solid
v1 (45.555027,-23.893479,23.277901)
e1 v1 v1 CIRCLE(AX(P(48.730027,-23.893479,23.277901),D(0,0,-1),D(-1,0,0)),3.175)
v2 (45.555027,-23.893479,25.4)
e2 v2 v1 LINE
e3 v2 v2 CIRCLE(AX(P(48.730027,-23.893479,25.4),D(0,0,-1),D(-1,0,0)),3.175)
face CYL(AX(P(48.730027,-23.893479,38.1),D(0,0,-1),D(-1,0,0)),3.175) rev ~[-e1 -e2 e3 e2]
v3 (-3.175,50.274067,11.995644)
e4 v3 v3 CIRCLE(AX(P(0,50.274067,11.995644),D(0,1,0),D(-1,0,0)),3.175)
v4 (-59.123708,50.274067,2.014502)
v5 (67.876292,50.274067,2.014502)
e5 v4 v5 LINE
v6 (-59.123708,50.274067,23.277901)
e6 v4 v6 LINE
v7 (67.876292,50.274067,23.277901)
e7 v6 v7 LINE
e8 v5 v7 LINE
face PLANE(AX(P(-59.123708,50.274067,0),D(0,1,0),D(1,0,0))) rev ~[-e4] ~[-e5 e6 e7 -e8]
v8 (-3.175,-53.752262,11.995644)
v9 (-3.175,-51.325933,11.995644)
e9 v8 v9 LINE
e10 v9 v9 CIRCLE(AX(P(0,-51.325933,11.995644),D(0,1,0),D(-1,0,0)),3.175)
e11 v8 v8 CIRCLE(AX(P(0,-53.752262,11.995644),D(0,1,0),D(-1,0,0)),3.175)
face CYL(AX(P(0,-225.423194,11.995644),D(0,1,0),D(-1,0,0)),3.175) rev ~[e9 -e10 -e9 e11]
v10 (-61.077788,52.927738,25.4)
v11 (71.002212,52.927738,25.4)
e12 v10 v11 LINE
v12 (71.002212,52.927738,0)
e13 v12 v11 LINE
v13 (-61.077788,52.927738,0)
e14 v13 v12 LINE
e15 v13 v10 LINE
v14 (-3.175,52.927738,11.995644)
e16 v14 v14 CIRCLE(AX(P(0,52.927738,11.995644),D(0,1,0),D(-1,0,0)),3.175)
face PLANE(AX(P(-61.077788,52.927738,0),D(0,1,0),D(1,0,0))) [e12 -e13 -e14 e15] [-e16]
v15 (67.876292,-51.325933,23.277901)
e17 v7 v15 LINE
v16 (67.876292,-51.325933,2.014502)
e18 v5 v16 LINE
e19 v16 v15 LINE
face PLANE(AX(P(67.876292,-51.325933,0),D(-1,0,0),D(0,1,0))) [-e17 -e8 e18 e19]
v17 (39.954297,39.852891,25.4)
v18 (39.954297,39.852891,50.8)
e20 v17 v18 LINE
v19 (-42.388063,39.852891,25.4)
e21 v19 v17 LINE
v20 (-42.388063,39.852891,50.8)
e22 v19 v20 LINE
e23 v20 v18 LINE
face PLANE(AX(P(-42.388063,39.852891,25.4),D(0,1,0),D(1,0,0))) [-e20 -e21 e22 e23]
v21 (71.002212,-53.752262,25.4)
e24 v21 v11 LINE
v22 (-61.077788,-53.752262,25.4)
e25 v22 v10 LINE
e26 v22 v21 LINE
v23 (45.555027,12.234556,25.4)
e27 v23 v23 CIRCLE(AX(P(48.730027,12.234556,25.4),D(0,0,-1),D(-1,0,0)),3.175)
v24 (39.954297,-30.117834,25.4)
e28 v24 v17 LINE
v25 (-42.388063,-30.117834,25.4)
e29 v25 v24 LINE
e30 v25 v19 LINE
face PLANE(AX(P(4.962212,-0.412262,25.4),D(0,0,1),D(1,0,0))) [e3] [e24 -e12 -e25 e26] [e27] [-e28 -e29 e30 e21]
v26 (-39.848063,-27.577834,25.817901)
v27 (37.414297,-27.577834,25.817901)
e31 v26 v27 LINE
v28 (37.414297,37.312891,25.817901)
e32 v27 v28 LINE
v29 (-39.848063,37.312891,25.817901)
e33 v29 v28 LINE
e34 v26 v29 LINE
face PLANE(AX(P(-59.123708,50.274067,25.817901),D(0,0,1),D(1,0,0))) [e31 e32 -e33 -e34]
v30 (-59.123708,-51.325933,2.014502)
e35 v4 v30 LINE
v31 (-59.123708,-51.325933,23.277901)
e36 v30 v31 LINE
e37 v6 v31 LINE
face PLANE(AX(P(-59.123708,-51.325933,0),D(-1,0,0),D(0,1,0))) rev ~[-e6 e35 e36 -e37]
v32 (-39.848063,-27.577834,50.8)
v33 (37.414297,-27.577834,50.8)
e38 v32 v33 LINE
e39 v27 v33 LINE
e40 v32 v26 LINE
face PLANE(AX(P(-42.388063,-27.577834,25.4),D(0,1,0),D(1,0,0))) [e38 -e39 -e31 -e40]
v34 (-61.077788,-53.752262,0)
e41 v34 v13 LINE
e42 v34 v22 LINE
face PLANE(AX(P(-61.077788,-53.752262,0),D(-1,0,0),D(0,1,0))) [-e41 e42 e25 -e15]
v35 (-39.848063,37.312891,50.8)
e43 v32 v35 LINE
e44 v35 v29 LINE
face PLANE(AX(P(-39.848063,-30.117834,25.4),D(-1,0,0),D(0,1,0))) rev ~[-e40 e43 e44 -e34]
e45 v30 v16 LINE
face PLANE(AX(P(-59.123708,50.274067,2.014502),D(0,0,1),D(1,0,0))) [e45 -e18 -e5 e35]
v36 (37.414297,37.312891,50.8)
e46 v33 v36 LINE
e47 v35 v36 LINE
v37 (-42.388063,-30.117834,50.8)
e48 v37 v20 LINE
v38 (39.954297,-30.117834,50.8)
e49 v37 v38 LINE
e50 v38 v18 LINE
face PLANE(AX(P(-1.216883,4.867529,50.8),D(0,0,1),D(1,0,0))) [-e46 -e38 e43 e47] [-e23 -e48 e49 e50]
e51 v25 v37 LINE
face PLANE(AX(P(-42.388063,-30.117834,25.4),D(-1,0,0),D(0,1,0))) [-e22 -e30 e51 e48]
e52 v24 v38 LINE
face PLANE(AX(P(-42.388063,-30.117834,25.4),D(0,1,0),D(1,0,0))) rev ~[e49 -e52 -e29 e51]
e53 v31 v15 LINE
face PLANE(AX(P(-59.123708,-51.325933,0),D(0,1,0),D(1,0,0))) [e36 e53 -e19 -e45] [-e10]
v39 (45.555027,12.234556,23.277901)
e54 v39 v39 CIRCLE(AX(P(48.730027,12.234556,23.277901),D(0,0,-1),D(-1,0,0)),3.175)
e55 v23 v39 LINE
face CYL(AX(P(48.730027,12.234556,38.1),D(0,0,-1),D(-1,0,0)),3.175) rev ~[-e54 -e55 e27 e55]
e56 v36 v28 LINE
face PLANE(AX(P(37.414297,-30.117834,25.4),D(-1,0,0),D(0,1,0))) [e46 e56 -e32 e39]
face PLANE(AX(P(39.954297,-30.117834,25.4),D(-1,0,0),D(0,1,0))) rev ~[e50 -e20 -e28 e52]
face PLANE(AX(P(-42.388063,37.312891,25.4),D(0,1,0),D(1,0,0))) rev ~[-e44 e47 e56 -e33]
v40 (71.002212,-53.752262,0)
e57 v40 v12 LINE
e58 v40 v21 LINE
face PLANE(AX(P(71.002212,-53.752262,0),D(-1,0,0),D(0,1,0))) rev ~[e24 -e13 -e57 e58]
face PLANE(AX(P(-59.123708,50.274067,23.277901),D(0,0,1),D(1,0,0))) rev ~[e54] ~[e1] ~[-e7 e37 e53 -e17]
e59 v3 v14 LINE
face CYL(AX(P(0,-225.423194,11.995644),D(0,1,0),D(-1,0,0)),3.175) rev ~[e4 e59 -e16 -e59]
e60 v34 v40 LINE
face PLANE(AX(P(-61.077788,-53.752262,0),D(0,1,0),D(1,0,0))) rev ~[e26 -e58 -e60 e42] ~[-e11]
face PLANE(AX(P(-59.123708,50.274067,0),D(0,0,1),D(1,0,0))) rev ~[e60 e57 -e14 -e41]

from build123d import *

# Parameters (mm, degrees)
F0_W      = 132.08
F0_H      = 106.68
F0_W_2    = 127
F0_H_2    = 101.6
F1_DEPTH  = 25.4
F2_W      = 127
F2_H      = 2.0145024173
F3_DEPTH  = 101.6
F5_D      = 6.35
F2_H_2    = 2.122098887
F6_DEPTH  = 101.6
F7_W      = 82.3423601687
F7_H      = 69.9707251042
F7_W_2    = 76.2
F7_H_2    = 63.5
F8_DEPTH  = 25.4
F10_D     = 6.35
F10_DEPTH = 12.7
F10_TIP   = 1.9077324654
F11_T     = -2.54


with BuildPart() as f1:
    # F0 (on Top) → F1 (new body)
    with BuildSketch(Plane.XY):
        with Locations((4.9622115278, -0.4122621453)):
            Rectangle(F0_W, F0_H)
        with Locations((4.3762922287, -0.5259333495)):
            Rectangle(F0_W_2, F0_H_2, mode=Mode.SUBTRACT)
    extrude(amount=F1_DEPTH)

    # F2 (on face) → F3 (join)
    with BuildSketch(Plane.XZ.offset(-50.2740666505)):
        with Locations((4.3762922287, 1.0072512086)):
            Rectangle(F2_W, F2_H)
    extrude(amount=F3_DEPTH)

    # F5 (through all)
    with Locations(Plane.XZ.offset(53.7522621453)):
        with Locations((0, 11.9956443086)):
            Hole(F5_D / 2)

    # F2 (on face) → F6 (join)
    with BuildSketch(Plane.XZ.offset(-50.2740666505)):
        with Locations((4.3762922287, 24.3389505565)):
            Rectangle(F2_W, F2_H_2)
        with Locations((4.3762922287, 1.0072512086)):
            Rectangle(F2_W, F2_H)
    extrude(amount=F6_DEPTH)

    # F7 (on face) → F8 (join)
    with BuildSketch(Plane.XY.offset(25.4)):
        with Locations((-1.2168828398, 4.8675285652)):
            Rectangle(F7_W, F7_H)
        with Locations((-1.7157470335, 5.1717488095)):
            Rectangle(F7_W_2, F7_H_2, mode=Mode.SUBTRACT)
        with Locations((-1.7157470335, 5.1717488095)):
            Rectangle(F7_W_2, F7_H_2)
    extrude(amount=F8_DEPTH)

    # F10
    with Locations(Plane.XY.offset(25.4)):
        with Locations((48.7300269306, -23.8934792578), (48.7300269306, 12.2345555574)):
            Hole(F10_D / 2, depth=F10_DEPTH)
            with Locations((0, 0, -(F10_DEPTH + F10_TIP / 2))):  # 118° drill point
                Cone(0, F10_D / 2, F10_TIP, mode=Mode.SUBTRACT)

    # F11
    f11_openings = [f1.faces().sort_by_distance(p)[0] for p in [
        (-1.216883, 4.867529, 50.8),
    ]]
    offset(amount=F11_T, openings=f11_openings)


solid = f1.part
